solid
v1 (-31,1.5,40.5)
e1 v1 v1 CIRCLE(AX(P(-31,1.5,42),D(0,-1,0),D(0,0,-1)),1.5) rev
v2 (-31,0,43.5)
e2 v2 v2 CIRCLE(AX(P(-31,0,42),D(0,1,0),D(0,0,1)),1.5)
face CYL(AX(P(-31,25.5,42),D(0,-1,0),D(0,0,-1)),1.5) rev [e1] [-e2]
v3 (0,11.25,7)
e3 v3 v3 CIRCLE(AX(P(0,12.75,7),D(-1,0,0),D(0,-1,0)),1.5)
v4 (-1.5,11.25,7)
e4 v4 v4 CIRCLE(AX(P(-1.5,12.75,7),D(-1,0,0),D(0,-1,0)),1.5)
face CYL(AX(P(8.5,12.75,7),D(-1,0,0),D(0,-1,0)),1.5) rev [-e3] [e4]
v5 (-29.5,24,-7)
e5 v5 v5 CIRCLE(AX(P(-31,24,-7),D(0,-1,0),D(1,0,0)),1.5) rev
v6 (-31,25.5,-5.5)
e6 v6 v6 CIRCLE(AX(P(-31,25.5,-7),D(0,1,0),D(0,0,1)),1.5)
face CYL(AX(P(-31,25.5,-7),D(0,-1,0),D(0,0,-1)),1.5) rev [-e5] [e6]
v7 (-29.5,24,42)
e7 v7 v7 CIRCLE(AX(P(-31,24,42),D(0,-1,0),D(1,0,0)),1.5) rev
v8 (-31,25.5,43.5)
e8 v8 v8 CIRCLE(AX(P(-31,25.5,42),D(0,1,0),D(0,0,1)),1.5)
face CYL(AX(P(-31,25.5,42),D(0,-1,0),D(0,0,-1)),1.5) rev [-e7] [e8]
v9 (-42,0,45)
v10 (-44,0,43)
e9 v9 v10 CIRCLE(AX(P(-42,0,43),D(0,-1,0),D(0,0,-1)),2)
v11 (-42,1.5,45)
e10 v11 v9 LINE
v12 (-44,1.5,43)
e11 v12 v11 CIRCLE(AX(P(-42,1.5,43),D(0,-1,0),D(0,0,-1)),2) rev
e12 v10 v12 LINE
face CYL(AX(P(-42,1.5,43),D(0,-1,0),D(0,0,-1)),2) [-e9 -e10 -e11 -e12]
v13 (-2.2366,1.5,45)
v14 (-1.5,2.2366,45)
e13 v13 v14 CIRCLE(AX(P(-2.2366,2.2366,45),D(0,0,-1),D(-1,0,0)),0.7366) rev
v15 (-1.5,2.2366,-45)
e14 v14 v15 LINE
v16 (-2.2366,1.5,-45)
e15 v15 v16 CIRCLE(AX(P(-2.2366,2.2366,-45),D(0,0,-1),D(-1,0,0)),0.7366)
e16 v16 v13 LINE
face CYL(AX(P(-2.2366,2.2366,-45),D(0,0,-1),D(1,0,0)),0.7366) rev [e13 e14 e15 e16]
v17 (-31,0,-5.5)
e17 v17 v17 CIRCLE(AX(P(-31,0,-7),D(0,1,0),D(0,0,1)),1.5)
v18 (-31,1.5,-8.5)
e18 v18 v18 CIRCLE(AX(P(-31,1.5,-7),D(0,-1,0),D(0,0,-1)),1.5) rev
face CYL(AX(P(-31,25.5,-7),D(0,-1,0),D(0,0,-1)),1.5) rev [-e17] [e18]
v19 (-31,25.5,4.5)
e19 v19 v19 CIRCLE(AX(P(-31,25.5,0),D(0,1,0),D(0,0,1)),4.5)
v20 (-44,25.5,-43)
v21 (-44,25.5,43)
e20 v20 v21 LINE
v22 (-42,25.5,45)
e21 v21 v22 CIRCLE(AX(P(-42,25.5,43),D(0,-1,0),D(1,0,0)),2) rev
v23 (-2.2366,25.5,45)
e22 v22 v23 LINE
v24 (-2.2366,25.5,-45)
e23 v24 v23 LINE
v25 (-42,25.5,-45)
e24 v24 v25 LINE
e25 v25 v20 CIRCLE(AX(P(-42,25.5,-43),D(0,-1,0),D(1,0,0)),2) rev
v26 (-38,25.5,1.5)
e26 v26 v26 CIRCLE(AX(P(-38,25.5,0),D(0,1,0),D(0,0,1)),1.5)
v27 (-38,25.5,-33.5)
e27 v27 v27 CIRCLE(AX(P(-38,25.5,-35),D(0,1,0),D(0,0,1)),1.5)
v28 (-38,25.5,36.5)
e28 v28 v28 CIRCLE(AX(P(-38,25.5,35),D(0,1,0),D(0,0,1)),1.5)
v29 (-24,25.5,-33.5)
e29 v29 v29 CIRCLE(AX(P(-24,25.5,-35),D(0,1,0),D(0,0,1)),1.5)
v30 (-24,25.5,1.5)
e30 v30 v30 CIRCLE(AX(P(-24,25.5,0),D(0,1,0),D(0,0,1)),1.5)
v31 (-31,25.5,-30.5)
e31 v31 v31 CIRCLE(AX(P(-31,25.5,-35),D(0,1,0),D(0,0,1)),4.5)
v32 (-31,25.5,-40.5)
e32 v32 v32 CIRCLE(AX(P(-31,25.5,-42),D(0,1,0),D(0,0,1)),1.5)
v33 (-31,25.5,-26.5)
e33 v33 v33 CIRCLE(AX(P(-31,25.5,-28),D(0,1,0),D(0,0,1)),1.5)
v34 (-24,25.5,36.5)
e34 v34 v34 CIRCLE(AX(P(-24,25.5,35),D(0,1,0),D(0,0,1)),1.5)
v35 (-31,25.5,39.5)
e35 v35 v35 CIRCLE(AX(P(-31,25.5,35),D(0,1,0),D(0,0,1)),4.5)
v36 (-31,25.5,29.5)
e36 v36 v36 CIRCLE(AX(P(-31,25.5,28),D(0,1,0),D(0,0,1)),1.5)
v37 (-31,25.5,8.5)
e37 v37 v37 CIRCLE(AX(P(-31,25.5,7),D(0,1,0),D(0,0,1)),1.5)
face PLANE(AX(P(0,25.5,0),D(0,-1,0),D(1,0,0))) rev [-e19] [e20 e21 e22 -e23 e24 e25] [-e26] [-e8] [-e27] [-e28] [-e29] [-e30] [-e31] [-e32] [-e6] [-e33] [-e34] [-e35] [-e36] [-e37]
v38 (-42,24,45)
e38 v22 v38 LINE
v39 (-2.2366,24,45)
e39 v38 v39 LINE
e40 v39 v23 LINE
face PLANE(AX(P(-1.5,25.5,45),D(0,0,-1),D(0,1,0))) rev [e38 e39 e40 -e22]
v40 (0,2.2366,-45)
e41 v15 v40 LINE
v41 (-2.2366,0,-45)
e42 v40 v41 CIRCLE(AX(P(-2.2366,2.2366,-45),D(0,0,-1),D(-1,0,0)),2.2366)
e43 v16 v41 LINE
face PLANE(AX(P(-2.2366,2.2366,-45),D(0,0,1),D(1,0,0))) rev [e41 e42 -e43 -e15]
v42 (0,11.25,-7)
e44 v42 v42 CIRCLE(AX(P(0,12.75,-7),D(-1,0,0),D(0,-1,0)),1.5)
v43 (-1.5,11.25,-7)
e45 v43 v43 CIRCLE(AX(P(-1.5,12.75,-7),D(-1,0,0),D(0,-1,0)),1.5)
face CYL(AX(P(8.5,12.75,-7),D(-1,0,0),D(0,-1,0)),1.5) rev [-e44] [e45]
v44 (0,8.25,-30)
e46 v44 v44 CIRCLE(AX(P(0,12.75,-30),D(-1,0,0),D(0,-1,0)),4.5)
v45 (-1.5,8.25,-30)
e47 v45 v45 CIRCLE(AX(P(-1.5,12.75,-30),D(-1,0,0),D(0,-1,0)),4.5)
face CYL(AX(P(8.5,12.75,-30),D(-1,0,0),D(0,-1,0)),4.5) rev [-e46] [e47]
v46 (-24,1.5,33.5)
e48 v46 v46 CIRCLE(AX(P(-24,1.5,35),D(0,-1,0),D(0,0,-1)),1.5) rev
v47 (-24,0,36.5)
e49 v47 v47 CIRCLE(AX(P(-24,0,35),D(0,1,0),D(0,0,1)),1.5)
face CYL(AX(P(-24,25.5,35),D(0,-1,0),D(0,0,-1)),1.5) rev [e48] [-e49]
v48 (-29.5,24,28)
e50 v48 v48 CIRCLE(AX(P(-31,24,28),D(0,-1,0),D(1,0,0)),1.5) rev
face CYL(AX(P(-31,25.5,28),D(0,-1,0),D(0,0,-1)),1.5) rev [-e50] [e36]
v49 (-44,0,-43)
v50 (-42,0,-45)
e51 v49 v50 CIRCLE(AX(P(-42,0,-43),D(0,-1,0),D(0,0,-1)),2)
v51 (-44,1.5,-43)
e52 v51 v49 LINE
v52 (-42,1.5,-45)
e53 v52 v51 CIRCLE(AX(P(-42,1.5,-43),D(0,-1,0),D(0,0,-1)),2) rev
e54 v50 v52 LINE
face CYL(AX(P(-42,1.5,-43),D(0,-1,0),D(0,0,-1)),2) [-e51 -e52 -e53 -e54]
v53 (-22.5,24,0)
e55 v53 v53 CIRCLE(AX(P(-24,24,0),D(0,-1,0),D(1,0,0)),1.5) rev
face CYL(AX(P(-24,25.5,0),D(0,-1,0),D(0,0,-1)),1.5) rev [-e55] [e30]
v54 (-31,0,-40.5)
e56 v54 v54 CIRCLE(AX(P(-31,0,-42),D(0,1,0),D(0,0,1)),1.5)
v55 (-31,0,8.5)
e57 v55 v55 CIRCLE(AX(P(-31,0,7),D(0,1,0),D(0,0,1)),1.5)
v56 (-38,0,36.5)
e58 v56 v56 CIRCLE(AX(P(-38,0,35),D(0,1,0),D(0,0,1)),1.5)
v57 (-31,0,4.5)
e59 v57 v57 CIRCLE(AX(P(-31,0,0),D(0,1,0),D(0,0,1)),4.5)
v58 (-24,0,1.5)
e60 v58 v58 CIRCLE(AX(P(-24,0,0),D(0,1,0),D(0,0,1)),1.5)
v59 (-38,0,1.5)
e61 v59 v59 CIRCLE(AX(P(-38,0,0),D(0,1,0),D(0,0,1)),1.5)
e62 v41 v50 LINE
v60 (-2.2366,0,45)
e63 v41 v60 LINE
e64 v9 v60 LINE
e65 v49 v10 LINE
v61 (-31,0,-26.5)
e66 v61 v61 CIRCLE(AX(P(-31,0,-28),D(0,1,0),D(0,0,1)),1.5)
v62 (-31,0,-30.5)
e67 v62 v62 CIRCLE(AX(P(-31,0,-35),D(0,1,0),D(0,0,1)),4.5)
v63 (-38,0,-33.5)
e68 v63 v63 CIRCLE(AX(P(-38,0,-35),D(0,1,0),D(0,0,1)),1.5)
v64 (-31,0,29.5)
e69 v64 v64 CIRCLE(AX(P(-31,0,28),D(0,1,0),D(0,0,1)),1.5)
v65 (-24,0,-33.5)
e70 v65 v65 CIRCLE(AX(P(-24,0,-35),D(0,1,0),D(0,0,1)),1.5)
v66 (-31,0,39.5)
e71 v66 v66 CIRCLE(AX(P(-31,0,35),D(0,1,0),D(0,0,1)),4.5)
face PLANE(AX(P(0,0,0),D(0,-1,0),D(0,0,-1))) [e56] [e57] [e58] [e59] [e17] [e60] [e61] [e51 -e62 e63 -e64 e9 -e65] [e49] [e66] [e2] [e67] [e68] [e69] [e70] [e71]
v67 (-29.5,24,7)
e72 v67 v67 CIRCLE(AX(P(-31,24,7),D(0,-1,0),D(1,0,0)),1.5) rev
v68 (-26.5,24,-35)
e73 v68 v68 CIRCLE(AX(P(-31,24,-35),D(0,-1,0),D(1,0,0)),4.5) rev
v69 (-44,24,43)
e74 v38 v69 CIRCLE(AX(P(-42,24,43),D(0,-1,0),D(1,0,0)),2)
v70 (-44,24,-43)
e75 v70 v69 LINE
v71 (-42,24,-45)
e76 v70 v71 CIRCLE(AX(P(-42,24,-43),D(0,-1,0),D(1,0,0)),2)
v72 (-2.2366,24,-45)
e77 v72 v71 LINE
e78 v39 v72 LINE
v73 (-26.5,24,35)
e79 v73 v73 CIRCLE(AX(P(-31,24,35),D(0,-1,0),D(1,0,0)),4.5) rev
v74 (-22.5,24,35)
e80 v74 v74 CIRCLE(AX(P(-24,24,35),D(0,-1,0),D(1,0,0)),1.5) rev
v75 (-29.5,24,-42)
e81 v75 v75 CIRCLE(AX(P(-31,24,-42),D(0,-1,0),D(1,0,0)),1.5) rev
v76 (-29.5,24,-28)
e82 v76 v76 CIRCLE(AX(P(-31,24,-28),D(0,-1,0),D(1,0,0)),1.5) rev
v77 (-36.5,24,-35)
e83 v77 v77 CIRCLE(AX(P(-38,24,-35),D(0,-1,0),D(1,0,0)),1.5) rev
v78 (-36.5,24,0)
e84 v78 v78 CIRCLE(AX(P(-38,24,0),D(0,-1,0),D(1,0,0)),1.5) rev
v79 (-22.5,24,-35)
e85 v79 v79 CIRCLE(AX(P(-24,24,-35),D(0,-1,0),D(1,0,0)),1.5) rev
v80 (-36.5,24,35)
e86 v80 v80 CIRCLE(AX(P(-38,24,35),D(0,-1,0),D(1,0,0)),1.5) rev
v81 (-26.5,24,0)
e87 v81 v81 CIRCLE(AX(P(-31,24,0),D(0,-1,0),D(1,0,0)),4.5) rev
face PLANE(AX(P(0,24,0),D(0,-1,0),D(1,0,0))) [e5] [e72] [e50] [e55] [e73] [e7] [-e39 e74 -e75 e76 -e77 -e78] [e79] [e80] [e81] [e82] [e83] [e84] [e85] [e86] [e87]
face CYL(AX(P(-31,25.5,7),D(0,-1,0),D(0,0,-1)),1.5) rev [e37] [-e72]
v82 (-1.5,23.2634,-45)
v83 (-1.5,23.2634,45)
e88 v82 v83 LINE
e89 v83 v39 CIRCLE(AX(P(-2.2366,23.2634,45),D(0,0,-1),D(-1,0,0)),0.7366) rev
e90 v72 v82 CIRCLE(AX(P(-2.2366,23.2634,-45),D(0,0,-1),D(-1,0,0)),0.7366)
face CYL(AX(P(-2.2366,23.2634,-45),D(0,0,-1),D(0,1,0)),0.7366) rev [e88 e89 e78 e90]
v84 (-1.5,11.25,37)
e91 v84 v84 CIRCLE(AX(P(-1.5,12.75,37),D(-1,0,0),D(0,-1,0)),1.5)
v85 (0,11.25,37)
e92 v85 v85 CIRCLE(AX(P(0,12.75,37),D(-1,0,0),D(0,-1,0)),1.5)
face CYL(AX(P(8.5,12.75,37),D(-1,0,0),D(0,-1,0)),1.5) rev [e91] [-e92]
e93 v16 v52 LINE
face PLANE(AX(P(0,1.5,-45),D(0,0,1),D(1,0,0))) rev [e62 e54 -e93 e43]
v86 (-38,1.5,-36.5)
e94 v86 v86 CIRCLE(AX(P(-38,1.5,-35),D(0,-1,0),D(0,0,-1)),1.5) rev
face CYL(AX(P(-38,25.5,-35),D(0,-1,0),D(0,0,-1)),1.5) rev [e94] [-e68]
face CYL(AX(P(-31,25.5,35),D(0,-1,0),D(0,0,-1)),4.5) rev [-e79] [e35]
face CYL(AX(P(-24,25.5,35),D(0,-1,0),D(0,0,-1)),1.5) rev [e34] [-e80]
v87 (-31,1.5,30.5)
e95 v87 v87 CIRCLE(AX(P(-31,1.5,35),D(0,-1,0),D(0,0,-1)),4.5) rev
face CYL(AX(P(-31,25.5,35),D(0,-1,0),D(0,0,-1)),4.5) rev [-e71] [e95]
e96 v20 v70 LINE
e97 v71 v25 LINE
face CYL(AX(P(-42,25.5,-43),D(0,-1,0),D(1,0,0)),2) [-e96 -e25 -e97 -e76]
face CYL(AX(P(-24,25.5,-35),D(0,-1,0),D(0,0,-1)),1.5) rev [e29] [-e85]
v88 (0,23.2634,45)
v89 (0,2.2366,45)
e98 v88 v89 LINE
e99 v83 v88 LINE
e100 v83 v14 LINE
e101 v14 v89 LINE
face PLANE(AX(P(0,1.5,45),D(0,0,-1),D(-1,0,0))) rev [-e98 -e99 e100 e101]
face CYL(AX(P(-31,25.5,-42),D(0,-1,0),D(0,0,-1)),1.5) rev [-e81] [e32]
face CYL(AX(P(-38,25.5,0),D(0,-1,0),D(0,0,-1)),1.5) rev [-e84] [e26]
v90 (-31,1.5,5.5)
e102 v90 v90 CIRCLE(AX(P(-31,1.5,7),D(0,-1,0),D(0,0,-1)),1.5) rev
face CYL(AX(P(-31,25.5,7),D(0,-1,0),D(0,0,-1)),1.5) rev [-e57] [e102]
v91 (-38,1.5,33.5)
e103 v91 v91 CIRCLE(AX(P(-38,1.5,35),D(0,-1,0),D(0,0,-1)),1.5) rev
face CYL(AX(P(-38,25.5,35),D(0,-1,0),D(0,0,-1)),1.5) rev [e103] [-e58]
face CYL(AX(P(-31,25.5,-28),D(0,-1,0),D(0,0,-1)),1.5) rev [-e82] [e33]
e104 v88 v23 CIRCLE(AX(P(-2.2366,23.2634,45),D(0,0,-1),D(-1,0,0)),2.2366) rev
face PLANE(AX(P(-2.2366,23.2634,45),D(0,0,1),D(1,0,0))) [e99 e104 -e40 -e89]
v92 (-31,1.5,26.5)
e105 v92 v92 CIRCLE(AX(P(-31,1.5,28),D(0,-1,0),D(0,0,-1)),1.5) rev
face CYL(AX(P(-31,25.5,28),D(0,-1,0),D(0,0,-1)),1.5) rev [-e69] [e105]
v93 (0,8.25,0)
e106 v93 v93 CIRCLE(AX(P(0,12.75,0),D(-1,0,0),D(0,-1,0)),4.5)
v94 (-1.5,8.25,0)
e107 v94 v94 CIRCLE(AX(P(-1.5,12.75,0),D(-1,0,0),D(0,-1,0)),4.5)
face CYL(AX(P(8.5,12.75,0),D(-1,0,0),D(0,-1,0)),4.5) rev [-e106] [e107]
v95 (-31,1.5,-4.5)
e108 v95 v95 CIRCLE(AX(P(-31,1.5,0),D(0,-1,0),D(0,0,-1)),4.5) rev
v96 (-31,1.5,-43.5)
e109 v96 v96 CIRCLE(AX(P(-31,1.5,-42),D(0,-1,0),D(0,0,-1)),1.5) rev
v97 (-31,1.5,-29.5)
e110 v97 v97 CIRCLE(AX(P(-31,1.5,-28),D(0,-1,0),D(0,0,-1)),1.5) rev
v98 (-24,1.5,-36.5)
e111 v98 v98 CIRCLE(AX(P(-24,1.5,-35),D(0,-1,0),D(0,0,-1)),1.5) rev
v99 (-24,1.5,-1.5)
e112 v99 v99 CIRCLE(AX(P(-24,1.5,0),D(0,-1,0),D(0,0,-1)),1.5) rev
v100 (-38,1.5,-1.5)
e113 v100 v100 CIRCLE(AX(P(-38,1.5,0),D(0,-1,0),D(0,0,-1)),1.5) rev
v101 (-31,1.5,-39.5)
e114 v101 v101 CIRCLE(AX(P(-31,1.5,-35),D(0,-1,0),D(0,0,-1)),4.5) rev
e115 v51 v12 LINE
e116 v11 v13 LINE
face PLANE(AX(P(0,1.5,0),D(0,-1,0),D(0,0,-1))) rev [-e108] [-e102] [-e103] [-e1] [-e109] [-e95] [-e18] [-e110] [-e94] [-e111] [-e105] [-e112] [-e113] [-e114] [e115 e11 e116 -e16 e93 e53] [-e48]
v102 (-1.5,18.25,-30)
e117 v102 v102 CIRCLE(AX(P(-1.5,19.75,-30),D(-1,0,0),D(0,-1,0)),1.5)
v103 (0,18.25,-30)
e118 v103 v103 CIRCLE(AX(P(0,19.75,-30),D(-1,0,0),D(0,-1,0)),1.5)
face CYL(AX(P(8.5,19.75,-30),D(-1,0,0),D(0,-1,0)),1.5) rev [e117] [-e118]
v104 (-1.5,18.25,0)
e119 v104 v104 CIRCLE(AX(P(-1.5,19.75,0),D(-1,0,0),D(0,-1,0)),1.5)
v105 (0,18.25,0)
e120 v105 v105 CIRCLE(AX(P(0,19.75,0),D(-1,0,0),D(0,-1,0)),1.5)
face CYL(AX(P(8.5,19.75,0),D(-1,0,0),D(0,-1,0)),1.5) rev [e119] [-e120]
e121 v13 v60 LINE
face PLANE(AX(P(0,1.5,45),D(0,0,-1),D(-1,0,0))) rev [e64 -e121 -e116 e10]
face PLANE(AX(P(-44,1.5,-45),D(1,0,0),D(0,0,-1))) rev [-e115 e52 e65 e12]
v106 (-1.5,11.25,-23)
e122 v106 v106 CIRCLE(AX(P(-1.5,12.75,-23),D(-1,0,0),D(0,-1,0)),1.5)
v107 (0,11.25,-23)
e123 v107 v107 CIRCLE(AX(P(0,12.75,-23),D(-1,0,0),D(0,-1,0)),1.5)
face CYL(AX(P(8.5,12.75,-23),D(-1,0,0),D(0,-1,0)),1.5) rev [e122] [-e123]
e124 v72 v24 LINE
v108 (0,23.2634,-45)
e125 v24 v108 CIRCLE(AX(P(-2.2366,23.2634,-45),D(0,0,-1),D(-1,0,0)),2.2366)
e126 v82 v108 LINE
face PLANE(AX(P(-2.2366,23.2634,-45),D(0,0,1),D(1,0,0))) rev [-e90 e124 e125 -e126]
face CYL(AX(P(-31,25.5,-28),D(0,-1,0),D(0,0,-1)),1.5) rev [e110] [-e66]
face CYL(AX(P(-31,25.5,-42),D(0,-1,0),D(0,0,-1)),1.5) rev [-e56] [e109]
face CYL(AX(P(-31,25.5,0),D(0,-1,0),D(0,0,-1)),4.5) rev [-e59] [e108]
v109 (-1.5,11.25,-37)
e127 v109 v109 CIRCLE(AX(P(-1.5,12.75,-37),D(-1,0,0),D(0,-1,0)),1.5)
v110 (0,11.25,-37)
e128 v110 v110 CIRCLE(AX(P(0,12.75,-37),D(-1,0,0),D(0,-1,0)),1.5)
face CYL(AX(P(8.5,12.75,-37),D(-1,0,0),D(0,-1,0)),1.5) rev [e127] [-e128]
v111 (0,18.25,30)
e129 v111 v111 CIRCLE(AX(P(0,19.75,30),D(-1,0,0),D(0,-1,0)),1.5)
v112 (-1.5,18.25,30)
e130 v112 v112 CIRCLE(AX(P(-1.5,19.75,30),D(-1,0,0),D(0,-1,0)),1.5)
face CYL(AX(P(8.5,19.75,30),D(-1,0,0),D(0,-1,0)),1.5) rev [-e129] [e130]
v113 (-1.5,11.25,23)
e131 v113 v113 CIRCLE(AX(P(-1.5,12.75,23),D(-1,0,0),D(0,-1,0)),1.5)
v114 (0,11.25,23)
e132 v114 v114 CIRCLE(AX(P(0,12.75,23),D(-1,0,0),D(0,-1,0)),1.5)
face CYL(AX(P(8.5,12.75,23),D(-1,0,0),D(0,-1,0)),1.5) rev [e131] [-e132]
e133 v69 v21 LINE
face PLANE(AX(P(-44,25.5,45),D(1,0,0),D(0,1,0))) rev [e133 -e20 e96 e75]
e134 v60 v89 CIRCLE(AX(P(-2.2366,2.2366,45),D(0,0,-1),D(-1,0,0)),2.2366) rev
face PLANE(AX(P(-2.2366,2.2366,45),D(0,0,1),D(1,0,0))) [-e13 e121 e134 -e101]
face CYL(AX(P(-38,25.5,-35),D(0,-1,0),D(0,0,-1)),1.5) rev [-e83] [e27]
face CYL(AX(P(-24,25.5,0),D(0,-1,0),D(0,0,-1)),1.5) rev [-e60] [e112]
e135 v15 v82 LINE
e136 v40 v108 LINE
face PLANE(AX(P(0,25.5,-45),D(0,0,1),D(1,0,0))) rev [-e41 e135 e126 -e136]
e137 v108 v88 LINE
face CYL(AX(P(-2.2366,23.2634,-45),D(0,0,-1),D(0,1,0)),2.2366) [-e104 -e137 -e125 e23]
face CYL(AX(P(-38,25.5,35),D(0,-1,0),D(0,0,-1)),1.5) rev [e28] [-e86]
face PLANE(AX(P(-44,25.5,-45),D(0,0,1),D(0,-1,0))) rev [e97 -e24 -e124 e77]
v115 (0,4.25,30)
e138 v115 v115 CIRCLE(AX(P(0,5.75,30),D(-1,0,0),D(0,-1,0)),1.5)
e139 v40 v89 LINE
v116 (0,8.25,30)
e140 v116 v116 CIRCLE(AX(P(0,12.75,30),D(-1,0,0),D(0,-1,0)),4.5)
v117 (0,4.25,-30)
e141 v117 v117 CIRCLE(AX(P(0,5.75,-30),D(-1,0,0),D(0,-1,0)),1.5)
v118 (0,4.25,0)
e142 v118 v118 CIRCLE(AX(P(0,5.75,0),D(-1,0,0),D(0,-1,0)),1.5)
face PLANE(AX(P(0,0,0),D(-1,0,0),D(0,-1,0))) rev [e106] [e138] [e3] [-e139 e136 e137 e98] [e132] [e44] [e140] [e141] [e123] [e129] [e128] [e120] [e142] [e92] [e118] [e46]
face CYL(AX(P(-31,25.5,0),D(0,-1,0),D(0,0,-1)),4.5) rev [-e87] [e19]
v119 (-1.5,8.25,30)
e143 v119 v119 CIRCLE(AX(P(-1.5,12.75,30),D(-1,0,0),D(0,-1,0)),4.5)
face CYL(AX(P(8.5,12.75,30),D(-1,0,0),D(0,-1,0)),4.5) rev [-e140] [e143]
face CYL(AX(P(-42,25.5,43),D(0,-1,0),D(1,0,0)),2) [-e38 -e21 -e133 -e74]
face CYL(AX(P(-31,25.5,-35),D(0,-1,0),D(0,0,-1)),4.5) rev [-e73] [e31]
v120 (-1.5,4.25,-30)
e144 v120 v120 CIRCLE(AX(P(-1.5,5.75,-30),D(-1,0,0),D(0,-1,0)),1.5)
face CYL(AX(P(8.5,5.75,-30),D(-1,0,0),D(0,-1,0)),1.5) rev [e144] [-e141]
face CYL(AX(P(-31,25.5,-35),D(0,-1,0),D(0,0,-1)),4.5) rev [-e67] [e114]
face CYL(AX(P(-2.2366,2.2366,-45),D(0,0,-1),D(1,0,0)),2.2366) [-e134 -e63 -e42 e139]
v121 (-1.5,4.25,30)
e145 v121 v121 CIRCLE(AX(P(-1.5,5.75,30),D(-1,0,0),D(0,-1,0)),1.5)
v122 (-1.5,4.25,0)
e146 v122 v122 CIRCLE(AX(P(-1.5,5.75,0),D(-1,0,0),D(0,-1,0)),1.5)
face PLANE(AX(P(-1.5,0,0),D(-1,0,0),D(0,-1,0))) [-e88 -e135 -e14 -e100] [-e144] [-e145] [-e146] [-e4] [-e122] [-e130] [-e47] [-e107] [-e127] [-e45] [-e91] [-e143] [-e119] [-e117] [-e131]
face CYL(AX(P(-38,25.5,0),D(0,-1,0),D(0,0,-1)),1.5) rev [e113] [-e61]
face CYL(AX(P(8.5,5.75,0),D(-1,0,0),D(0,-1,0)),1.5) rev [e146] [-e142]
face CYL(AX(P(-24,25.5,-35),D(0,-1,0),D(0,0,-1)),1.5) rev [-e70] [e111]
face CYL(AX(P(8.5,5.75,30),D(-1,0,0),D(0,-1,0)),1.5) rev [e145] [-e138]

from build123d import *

# Parameters (mm, degrees)
SKETCH1_W                    = 44
SKETCH1_H                    = 90
BASE_FLANGE1_DEPTH           = 1.5
EDGE_FLANGE1_STRIP_W         = 7.4732
EDGE_FLANGE1_STRIP_H         = 1.5
EDGE_FLANGE1_STRIP_CUT_DEPTH = 90
EDGE_FLANGE1_DEPTH           = 90
EDGE_FLANGE2_STRIP_W         = 7.4732
EDGE_FLANGE2_STRIP_H         = 1.5
EDGE_FLANGE2_STRIP_CUT_DEPTH = 90
EDGE_FLANGE2_DEPTH           = 90
SKETCH12_R                   = 4.5
SKETCH12_R_2                 = 1.5
CUT_EXTRUDE4_DEPTH           = 68.906185285
SKETCH13_R                   = 4.5
SKETCH13_R_2                 = 1.5
CUT_EXTRUDE5_DEPTH           = 10
LPATTERN1_COUNT              = 2
LPATTERN1_PITCH              = 30
LPATTERN1_COL_COUNT          = 2
LPATTERN1_COL_PITCH          = 30
FILLET1_R                    = 2


# Sheet-metal steps are written as plain solids
with BuildPart() as part:
    # Sketch1 → Base-Flange1 (new body)
    with BuildSketch(Plane(origin=(0, 0, 0), x_dir=(1, 0, 0), z_dir=(0, 1, 0))):
        with Locations((-22, 0)):
            Rectangle(SKETCH1_W, SKETCH1_H)
    extrude(amount=BASE_FLANGE1_DEPTH)

    # Edge-Flange1 strip (across the edge) → Edge-Flange1 strip cut (cut)
    with BuildSketch(Plane(origin=(0, 1.5, 45), x_dir=(-1, 0, 0), z_dir=(0, 0, -1))):
        with Locations((-1.5, -0.75)):
            Rectangle(EDGE_FLANGE1_STRIP_W, EDGE_FLANGE1_STRIP_H)
    extrude(amount=EDGE_FLANGE1_STRIP_CUT_DEPTH, mode=Mode.SUBTRACT)

    # Edge-Flange1 section (across the edge) → Edge-Flange1 (add)
    with BuildSketch(Plane(origin=(0, 1.5, 45), x_dir=(-1, 0, 0), z_dir=(0, 0, -1))):
        with BuildLine():
            Line((0, 0.7366), (0, 24))
            Line((0, 24), (1.5, 24))
            Line((1.5, 24), (1.5, 0.7366))
            ThreePointArc((1.5, 0.7366), (1.715745145, 0.215745145), (2.2366, 0))
            Line((2.2366, 0), (2.2366, -1.5))
            ThreePointArc((2.2366, -1.5), (0.655084973, -0.844915027), (0, 0.7366))
        make_face()
    extrude(amount=EDGE_FLANGE1_DEPTH)

    # Edge-Flange2 strip (across the edge) → Edge-Flange2 strip cut (cut)
    with BuildSketch(Plane(origin=(-1.5, 25.5, 45), x_dir=(0, -1, 0), z_dir=(0, 0, -1))):
        with Locations((-1.5, -0.75)):
            Rectangle(EDGE_FLANGE2_STRIP_W, EDGE_FLANGE2_STRIP_H)
    extrude(amount=EDGE_FLANGE2_STRIP_CUT_DEPTH, mode=Mode.SUBTRACT)

    # Edge-Flange2 section (across the edge) → Edge-Flange2 (add)
    with BuildSketch(Plane(origin=(-1.5, 25.5, 45), x_dir=(0, -1, 0), z_dir=(0, 0, -1))):
        with BuildLine():
            Line((0, 0.7366), (0, 42.5))
            Line((0, 42.5), (1.5, 42.5))
            Line((1.5, 42.5), (1.5, 0.7366))
            ThreePointArc((1.5, 0.7366), (1.715745145, 0.215745145), (2.2366, 0))
            Line((2.2366, 0), (2.2366, -1.5))
            ThreePointArc((2.2366, -1.5), (0.655084973, -0.844915027), (0, 0.7366))
        make_face()
    extrude(amount=EDGE_FLANGE2_DEPTH)

    # Sketch12 → Cut-Extrude4 (cut, through all)
    with BuildSketch(Plane(origin=(0, 0, 0), x_dir=(1, 0, 0), z_dir=(0, 1, 0))):
        with Locations((-31, 35)):
            Circle(SKETCH12_R)
        with Locations((-31, 42)):
            Circle(SKETCH12_R_2)
        with Locations((-31, 28)):
            Circle(SKETCH12_R_2)
        with Locations((-24, 35)):
            Circle(SKETCH12_R_2)
        with Locations((-38, 35)):
            Circle(SKETCH12_R_2)
        with Locations((-31, 0)):
            Circle(SKETCH12_R)
        with Locations((-31, 7)):
            Circle(SKETCH12_R_2)
        with Locations((-31, -7)):
            Circle(SKETCH12_R_2)
        with Locations((-24, 0)):
            Circle(SKETCH12_R_2)
        with Locations((-38, 0)):
            Circle(SKETCH12_R_2)
        with Locations((-31, -35)):
            Circle(SKETCH12_R)
        with Locations((-31, -28)):
            Circle(SKETCH12_R_2)
        with Locations((-24, -35)):
            Circle(SKETCH12_R_2)
        with Locations((-38, -35)):
            Circle(SKETCH12_R_2)
        with Locations((-31, -42)):
            Circle(SKETCH12_R_2)
    extrude(amount=CUT_EXTRUDE4_DEPTH, mode=Mode.SUBTRACT)

    # Sketch13 → Cut-Extrude5 (cut)
    with BuildSketch(Plane.ZY.offset(1.5)):
        with Locations(Location((0, 12.75, 0), (0, 0, 270))):
            Circle(SKETCH13_R)
        with Locations(Location((0, 19.75, 0), (0, 0, 270))):
            Circle(SKETCH13_R_2)
        with Locations(Location((0, 5.75, 0), (0, 0, 270))):
            Circle(SKETCH13_R_2)
        with Locations(Location((7, 12.75, 0), (0, 0, 270))):
            Circle(SKETCH13_R_2)
        with Locations(Location((-7, 12.75, 0), (0, 0, 270))):
            Circle(SKETCH13_R_2)
    cut_extrude5 = extrude(amount=-CUT_EXTRUDE5_DEPTH, mode=Mode.SUBTRACT)

    # LPattern1: Cut-Extrude5 ×2
    with Locations(*[(0, 0, -i * LPATTERN1_PITCH) for i in range(1, LPATTERN1_COUNT)]):
        add(cut_extrude5, mode=Mode.SUBTRACT)

    # LPattern1 col: Cut-Extrude5 ×2
    with Locations(*[(0, 0, i * LPATTERN1_COL_PITCH) for i in range(1, LPATTERN1_COL_COUNT)]):
        add(cut_extrude5, mode=Mode.SUBTRACT)

    # Fillet1
    fillet1_edges = [part.edges().sort_by_distance(p)[0] for p in [
        (-44, 24.75, 45),
        (-44, 24.75, -45),
        (-44, 0.75, 45),
        (-44, 0.75, -45),
    ]]
    fillet(fillet1_edges, radius=FILLET1_R)


solid = part.part
